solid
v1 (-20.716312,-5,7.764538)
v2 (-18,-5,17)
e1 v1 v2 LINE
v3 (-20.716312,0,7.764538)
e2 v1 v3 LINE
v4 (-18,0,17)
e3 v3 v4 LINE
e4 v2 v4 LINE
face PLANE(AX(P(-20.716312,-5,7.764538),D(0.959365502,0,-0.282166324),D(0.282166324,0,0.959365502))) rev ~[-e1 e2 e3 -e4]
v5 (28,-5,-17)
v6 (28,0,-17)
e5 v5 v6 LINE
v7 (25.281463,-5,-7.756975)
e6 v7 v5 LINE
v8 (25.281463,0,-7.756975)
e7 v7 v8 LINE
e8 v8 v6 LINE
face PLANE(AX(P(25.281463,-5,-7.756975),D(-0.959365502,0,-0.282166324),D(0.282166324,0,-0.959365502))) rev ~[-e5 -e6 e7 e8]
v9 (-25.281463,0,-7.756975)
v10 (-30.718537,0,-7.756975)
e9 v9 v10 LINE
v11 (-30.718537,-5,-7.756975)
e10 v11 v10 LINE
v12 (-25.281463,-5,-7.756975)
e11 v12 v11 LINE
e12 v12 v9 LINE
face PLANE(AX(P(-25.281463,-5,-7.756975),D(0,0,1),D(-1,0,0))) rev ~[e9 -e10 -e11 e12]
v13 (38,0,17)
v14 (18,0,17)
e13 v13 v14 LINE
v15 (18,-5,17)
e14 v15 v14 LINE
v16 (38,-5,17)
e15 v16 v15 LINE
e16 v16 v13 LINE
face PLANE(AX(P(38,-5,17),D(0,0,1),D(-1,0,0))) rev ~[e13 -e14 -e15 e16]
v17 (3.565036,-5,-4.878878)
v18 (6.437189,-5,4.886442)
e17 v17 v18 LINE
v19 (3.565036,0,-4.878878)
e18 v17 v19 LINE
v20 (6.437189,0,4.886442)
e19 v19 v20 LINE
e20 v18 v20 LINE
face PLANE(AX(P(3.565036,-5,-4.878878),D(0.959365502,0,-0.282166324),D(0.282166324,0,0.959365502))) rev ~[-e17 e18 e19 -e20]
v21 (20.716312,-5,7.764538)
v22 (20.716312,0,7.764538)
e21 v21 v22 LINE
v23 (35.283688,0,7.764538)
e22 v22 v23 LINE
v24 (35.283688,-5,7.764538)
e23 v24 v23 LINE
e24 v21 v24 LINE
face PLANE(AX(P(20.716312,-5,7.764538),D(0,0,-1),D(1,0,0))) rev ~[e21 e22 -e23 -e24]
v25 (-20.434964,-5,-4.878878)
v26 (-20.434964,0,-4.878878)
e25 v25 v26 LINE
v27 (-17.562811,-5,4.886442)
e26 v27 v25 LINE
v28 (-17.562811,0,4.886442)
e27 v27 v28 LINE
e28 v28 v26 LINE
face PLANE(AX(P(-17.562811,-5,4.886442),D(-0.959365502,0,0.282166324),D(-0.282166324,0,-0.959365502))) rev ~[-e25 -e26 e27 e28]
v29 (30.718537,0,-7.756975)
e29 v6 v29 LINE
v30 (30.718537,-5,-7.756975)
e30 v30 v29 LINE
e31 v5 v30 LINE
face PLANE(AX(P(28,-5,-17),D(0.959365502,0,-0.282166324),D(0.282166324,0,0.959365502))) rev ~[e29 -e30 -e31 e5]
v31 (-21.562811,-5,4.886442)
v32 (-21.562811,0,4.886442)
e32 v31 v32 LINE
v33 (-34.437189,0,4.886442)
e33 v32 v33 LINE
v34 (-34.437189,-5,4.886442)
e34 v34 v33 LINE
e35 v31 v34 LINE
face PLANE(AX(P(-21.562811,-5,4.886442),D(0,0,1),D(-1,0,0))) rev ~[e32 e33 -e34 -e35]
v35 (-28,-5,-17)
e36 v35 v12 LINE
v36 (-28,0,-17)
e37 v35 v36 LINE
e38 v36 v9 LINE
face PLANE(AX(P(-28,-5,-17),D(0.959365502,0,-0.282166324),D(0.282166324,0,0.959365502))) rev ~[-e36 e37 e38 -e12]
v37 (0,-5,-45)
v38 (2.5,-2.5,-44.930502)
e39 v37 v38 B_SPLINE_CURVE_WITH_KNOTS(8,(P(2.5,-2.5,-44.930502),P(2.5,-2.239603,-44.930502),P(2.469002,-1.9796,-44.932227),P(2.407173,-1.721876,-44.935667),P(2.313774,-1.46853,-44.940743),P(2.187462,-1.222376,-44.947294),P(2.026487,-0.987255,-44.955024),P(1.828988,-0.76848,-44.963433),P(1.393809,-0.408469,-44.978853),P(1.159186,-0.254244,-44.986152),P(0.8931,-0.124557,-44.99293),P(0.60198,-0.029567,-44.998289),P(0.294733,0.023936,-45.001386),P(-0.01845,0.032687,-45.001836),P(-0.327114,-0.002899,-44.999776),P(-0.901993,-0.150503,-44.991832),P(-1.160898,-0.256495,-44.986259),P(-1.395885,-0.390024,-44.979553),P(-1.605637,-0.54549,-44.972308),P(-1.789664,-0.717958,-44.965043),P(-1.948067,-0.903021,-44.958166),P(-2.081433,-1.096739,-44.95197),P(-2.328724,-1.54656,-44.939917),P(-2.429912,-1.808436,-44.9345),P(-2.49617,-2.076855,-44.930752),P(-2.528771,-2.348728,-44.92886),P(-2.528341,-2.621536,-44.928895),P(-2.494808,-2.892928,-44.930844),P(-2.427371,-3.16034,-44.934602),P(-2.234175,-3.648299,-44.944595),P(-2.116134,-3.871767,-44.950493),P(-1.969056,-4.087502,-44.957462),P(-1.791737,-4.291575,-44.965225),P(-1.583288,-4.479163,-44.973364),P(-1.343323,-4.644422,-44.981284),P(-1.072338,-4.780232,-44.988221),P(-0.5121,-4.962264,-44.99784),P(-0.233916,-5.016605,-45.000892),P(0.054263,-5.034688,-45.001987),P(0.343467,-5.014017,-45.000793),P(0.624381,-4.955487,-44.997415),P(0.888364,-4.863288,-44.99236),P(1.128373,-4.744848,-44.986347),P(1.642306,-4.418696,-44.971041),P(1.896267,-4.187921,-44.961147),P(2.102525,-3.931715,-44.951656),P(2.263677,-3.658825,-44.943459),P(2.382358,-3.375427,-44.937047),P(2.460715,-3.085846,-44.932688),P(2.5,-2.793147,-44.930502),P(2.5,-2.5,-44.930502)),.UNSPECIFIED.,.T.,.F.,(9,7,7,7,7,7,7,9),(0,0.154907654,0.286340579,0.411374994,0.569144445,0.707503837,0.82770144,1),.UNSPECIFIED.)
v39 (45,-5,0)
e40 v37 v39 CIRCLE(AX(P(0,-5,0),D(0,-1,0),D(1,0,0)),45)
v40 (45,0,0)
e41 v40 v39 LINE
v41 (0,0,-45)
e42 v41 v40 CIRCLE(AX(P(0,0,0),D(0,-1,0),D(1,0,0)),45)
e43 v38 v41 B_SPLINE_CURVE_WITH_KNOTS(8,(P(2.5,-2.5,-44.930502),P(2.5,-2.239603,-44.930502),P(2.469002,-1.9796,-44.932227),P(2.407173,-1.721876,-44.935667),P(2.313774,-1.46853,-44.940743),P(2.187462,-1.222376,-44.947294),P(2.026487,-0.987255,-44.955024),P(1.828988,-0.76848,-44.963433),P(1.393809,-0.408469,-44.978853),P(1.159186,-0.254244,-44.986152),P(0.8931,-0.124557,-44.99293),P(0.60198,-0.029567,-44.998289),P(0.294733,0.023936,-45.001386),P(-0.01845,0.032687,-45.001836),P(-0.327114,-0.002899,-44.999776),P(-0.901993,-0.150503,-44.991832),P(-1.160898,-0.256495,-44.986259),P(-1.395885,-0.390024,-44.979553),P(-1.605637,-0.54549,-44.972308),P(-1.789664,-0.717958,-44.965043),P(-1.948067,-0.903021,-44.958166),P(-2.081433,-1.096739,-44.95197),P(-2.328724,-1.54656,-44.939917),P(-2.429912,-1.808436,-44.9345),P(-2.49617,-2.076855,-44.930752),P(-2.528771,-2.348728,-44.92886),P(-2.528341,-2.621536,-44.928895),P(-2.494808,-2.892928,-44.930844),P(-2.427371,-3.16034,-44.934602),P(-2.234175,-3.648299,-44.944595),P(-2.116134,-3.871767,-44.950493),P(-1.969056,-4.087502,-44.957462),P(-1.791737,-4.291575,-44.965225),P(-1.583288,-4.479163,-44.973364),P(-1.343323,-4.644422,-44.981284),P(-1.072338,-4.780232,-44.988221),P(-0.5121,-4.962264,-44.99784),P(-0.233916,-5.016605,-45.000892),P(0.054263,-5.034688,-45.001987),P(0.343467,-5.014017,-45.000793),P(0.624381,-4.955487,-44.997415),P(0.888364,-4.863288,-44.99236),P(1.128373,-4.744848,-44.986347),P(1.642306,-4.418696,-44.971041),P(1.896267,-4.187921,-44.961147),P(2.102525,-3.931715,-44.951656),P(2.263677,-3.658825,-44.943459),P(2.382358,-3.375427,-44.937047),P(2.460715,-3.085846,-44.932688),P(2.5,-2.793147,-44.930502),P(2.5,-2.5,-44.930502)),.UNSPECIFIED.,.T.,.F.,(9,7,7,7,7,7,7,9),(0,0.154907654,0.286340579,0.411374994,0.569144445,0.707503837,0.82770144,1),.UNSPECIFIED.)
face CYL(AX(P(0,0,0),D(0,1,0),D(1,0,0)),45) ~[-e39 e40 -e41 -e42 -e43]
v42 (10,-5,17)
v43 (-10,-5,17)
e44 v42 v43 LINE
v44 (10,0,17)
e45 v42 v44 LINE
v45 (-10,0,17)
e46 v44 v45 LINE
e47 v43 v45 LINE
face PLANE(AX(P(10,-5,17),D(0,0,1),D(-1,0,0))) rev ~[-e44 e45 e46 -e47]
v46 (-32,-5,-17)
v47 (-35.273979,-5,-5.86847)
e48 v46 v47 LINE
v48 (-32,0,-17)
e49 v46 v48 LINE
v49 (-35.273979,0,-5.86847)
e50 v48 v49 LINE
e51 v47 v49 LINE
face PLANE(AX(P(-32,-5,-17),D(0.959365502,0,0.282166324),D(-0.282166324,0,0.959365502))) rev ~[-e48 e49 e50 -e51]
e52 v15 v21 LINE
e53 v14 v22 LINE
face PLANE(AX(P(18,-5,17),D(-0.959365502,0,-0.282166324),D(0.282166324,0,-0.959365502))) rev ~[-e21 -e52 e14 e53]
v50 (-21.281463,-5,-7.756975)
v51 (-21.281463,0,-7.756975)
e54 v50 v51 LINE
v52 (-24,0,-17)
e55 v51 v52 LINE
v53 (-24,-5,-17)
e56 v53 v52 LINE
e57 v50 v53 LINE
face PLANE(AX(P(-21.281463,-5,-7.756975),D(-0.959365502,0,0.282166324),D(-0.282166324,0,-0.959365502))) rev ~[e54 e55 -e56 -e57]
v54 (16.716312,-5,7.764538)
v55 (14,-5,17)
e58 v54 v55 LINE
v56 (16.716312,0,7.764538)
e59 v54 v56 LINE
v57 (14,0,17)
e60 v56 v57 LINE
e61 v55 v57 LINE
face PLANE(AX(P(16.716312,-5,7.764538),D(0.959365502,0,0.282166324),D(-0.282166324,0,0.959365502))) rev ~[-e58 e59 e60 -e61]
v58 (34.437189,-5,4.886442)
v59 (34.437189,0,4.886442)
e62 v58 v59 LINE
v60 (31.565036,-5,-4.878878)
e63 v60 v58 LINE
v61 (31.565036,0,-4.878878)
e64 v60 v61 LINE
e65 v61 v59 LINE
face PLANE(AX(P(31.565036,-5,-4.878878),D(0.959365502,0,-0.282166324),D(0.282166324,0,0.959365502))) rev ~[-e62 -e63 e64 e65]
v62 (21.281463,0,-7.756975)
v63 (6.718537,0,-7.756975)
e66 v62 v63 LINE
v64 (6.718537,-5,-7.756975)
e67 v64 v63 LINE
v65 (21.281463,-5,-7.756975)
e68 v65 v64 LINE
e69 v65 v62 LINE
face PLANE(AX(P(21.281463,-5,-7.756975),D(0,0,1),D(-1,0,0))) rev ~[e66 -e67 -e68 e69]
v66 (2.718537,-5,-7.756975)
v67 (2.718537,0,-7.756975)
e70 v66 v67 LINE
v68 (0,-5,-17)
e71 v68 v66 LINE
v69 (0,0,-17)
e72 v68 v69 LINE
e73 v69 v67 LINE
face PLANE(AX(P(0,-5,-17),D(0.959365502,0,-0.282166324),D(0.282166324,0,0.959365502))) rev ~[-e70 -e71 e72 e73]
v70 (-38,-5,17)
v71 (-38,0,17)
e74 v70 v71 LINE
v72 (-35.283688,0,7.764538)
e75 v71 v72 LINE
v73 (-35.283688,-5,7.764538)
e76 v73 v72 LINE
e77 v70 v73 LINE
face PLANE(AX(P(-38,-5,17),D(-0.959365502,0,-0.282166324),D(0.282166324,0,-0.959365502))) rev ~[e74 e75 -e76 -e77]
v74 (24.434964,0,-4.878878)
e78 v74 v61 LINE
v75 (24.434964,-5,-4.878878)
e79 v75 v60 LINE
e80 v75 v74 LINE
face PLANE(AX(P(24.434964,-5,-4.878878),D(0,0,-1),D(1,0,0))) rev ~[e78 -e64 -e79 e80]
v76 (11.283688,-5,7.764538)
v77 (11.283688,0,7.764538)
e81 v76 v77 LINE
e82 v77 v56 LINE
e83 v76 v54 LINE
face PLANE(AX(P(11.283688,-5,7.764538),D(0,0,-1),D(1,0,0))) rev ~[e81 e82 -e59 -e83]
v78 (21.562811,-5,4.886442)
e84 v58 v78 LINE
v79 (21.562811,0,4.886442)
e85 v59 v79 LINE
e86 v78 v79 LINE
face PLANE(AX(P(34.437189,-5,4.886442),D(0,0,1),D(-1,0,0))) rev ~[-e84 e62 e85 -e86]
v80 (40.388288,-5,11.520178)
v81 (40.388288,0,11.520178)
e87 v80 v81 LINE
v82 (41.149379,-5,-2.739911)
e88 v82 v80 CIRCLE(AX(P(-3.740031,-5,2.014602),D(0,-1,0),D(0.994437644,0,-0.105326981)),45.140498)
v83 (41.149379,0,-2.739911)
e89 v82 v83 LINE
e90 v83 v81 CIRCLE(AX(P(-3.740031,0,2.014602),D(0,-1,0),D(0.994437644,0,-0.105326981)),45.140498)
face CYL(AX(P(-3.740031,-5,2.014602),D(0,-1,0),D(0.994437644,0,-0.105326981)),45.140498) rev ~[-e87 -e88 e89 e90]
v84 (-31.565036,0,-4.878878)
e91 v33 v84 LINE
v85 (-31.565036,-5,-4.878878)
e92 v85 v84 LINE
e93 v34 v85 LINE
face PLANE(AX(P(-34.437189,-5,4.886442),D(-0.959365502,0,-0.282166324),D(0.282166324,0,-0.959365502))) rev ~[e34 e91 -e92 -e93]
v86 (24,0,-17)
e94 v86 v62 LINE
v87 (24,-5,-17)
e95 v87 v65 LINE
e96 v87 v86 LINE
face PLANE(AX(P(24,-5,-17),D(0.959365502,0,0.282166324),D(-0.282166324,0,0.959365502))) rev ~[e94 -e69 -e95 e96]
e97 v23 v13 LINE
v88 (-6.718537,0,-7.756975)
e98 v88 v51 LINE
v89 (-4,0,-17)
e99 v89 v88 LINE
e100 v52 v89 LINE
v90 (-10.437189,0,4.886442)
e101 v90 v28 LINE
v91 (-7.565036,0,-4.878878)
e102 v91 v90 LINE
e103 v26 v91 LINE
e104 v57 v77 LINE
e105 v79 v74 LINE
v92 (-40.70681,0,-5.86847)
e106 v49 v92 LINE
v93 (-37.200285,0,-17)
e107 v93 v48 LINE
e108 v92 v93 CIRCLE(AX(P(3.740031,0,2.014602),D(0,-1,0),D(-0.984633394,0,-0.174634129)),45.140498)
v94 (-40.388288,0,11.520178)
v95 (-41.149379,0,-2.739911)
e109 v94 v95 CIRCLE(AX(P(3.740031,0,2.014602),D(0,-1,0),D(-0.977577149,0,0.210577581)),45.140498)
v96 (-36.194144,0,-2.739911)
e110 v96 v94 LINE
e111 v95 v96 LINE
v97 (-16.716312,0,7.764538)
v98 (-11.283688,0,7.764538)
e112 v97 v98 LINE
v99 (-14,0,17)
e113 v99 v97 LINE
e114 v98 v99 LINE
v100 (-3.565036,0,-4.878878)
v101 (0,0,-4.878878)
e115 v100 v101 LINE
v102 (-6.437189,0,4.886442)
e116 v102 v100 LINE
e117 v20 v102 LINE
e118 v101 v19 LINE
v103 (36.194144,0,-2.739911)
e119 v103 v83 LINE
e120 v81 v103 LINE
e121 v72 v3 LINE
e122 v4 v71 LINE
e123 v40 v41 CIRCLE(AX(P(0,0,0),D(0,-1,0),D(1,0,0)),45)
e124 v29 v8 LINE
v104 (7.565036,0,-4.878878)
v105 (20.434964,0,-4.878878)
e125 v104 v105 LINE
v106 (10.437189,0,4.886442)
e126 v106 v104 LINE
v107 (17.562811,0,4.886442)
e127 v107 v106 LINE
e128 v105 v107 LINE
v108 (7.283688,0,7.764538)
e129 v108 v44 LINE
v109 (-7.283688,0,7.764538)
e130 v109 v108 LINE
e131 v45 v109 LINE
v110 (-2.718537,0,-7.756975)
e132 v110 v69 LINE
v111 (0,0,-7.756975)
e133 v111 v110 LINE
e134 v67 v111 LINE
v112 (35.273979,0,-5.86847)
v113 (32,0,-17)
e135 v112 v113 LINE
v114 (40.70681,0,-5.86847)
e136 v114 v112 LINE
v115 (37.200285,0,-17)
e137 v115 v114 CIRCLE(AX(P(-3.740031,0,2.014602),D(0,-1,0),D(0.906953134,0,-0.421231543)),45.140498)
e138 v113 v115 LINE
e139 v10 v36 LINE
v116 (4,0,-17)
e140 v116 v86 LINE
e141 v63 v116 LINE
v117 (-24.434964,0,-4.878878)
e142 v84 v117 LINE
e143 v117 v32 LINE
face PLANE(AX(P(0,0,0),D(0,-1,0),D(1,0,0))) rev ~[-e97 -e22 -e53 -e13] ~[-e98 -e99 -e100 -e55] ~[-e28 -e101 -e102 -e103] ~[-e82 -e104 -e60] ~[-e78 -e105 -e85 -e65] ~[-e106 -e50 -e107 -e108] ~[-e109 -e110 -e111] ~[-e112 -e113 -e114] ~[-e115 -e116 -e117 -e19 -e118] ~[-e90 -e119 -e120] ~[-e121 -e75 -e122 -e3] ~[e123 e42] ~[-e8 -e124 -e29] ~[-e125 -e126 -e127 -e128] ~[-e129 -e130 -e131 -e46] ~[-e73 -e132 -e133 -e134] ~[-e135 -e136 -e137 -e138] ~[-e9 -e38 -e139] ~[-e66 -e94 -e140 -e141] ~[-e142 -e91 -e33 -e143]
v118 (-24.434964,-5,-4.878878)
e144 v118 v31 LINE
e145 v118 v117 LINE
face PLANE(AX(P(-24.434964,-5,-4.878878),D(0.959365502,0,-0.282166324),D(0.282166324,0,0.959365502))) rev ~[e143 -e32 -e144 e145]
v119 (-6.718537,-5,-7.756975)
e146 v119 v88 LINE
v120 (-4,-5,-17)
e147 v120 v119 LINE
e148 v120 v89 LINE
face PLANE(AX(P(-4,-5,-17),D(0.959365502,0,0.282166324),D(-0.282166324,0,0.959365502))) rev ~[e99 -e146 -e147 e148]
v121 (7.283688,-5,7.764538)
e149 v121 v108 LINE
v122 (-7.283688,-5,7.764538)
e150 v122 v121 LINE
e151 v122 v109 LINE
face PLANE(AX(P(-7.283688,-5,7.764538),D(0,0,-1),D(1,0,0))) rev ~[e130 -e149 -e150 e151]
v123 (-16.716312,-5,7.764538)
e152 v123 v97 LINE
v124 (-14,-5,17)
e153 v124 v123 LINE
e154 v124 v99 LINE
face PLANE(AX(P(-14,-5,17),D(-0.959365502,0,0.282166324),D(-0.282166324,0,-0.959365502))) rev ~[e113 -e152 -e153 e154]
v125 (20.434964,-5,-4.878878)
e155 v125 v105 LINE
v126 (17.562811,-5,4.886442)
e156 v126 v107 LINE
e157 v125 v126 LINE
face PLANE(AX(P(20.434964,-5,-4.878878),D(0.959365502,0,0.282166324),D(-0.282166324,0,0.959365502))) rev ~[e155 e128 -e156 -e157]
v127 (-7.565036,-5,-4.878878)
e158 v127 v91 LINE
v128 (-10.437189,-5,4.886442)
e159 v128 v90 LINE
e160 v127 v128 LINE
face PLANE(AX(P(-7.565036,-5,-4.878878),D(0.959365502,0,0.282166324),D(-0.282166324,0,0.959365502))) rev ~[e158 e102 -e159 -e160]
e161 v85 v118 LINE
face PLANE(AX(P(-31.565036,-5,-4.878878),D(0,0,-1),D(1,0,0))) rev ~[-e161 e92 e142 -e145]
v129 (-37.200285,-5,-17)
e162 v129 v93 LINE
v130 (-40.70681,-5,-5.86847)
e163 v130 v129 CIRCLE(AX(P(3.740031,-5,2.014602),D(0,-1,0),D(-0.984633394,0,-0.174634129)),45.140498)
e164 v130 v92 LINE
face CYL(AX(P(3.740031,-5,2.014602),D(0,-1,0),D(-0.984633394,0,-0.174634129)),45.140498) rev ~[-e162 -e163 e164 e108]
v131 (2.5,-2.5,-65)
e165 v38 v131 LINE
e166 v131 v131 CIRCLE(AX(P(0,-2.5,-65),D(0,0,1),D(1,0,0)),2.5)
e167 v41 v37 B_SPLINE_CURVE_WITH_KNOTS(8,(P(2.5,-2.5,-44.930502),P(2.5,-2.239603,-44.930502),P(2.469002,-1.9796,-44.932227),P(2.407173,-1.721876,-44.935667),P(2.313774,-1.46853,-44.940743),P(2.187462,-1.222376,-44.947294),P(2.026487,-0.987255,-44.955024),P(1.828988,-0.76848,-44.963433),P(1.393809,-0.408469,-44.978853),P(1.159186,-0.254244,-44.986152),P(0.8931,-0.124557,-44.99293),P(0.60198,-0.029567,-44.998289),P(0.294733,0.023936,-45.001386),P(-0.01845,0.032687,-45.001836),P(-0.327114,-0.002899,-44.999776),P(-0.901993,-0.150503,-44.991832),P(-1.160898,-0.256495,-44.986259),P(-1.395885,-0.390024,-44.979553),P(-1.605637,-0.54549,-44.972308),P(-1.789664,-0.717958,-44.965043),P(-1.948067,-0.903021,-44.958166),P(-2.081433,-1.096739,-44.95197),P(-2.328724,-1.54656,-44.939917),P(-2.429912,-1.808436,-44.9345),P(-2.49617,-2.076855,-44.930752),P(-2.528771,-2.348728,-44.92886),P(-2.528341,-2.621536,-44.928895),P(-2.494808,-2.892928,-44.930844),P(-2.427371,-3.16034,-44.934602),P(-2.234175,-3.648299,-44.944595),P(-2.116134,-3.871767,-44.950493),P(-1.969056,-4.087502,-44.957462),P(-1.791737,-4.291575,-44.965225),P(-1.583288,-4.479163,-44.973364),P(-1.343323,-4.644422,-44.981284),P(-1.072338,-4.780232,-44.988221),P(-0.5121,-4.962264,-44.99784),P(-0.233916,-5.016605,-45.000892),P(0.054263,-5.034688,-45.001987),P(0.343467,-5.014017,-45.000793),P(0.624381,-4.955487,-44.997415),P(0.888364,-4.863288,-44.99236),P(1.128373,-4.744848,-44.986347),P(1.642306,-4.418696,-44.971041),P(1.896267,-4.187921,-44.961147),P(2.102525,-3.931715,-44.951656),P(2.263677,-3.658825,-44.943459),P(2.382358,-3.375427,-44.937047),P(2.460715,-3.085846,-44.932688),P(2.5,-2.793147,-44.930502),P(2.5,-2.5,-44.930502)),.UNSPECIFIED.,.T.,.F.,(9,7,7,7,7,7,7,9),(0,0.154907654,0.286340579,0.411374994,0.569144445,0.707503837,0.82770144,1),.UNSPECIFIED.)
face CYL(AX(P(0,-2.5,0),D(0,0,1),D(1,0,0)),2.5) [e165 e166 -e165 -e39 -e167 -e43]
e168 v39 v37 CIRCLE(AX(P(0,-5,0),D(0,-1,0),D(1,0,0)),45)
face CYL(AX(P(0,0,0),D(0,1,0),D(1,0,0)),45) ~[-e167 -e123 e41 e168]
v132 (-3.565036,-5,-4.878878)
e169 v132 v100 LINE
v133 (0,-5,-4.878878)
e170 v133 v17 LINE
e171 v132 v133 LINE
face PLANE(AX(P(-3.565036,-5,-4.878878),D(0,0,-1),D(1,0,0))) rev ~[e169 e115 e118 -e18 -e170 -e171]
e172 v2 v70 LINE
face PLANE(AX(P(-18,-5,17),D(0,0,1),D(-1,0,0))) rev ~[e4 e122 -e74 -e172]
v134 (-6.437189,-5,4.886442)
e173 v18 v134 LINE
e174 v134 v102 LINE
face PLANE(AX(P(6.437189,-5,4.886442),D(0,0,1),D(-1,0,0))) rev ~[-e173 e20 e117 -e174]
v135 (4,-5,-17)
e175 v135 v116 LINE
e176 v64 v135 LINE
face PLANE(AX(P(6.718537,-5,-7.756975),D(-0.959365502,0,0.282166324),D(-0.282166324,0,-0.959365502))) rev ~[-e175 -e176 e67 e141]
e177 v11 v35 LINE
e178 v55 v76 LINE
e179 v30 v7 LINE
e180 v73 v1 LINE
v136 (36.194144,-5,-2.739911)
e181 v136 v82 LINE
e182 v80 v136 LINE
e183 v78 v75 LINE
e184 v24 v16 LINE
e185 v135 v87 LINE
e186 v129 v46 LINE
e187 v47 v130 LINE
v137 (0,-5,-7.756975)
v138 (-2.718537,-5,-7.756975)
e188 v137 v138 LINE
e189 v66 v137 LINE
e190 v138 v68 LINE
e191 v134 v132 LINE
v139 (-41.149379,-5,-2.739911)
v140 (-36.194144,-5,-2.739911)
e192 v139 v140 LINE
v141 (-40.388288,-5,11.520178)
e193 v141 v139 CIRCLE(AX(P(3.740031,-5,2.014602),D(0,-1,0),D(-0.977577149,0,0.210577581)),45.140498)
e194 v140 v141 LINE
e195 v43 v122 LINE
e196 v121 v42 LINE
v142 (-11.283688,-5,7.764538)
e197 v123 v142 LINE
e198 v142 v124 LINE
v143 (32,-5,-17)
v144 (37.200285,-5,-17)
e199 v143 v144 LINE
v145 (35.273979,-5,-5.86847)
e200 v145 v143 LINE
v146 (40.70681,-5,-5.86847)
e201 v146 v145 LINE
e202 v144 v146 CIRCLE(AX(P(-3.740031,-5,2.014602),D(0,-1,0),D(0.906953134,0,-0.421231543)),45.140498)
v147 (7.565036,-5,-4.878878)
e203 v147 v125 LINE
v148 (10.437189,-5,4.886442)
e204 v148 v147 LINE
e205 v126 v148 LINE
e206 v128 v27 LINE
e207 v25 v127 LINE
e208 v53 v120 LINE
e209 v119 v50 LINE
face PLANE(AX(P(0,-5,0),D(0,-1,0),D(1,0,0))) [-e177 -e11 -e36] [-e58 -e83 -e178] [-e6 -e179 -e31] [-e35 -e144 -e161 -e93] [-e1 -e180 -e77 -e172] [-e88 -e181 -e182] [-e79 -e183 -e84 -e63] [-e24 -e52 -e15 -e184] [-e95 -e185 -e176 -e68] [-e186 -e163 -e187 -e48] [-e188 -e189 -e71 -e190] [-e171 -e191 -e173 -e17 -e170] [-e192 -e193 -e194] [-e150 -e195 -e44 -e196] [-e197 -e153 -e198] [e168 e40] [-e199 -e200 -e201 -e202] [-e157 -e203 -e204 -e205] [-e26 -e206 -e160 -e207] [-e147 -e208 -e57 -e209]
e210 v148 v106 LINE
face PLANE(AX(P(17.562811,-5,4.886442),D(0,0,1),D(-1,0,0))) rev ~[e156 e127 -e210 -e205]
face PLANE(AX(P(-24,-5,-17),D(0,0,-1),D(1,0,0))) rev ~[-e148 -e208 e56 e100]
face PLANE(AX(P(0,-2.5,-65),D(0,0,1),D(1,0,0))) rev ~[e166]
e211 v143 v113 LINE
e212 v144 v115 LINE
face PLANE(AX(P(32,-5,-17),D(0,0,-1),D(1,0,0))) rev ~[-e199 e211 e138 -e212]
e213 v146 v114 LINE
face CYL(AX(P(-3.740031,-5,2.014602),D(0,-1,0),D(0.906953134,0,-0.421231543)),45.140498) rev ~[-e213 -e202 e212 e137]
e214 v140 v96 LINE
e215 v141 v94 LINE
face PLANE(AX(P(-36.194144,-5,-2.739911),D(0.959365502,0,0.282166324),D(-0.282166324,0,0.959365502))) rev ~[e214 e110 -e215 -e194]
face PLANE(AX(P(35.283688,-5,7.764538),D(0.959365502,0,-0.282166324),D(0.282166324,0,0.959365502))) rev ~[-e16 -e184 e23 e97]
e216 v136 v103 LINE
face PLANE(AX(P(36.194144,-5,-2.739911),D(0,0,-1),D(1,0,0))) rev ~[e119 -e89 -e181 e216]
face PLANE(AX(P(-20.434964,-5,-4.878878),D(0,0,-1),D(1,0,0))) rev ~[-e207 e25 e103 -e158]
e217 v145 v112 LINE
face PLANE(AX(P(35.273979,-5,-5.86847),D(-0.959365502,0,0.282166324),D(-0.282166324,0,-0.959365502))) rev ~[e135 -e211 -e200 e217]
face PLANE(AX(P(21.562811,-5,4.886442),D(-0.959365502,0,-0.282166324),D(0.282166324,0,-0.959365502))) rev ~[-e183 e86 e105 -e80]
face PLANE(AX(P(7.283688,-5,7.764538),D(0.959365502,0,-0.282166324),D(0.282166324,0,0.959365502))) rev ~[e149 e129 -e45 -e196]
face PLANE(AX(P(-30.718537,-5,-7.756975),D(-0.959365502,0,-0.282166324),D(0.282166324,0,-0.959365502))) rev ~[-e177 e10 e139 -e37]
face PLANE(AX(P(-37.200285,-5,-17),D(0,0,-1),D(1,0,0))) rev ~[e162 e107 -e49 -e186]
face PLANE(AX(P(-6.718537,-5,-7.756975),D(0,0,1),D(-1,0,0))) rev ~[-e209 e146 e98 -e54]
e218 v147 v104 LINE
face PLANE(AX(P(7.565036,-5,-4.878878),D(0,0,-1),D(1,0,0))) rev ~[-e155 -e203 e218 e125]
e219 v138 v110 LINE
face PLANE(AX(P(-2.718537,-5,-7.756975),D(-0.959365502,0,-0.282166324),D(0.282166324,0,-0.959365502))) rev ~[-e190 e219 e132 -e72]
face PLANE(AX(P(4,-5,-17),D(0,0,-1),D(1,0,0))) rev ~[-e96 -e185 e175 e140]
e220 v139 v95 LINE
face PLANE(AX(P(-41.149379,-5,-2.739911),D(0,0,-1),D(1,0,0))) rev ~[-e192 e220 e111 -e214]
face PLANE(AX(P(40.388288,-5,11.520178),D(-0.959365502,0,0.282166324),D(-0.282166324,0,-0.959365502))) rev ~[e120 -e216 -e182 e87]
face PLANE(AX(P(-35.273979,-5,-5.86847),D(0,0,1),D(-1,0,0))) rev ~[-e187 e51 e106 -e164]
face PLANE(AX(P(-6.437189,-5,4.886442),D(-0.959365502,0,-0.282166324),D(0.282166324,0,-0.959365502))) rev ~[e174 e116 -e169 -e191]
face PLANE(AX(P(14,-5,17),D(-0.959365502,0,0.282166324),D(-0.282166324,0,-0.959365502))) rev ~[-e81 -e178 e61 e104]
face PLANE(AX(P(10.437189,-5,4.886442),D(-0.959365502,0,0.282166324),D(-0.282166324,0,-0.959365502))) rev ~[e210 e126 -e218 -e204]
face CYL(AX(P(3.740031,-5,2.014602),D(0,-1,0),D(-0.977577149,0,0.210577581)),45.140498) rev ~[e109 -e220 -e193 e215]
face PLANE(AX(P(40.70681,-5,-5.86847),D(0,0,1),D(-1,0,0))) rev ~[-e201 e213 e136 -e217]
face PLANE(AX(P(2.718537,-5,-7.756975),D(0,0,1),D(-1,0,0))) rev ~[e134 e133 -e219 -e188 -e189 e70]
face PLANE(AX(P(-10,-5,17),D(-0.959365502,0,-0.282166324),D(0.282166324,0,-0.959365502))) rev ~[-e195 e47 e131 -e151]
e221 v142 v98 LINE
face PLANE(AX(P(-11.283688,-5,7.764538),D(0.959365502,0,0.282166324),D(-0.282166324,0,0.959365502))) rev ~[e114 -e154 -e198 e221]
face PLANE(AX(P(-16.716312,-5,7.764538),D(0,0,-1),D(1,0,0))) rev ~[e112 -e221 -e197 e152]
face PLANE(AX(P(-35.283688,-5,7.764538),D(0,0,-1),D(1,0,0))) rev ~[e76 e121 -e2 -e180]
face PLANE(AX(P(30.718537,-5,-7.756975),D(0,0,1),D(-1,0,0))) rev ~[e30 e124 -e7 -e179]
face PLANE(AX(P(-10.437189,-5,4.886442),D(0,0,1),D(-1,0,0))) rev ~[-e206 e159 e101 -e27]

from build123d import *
from build123d import SkipClean  # not in build123d's __all__

# Parameters (mm, degrees)
F0_R     = 45
F1_DEPTH = 5
F2_R     = 2.5
F3_DEPTH = 65
F7_DEPTH = 5.0010001144


# Not quite as in the source:
# - a feature of the source that left no trace in its solid (it failed there, or was rolled back) is left out
# - a feature names something its author has since deleted; it is built from what else it names


with BuildPart() as f1:
    # F0 (on Front) → F1 (new body)
    with BuildSketch(Plane.XZ):
        Circle(F0_R)
    extrude(amount=F1_DEPTH)

    # F2 (on Top) → F3 (join)
    with BuildSketch(Plane.XY):
        with Locations((0, -2.5)):
            Circle(F2_R)
    with SkipClean():  # cleaning this boolean's faces spoils the solid; the shape is the same uncleaned
        extrude(amount=-F3_DEPTH)

    # F6 (on face) → F7 (cut, through all)
    with BuildSketch(Plane.XZ.offset(5)):
        Polygon((-20.7163122443, 7.7645383693), (-18, 17), (-38, 17), (-35.2836877557, 7.7645383693), align=None)
        with BuildLine():
            Line((-36.1941438848, -2.7399107917), (-40.3882877696, 11.5201784167))
            ThreePointArc((-40.3882877696, 11.5201784167), (-41.3363102402, 4.4204212554), (-41.1493788917, -2.7399107917))
            Line((-41.1493788917, -2.7399107917), (-36.1941438848, -2.7399107917))
        make_face()
        with BuildLine():
            Line((-32, -17), (-35.2739794285, -5.8684699433))
            Line((-35.2739794285, -5.8684699433), (-40.7068101942, -5.8684699433))
            ThreePointArc((-40.7068101942, -5.8684699433), (-39.3148104816, -11.548035888), (-37.2002845672, -17))
            Line((-37.2002845672, -17), (-32, -17))
        make_face()
        Polygon((-24.4349641852, -4.8788782297), (-21.5628112163, 4.8864418646), (-34.4371887837, 4.8864418646), (-31.5650358148, -4.8788782297), align=None)
        Polygon((-28, -17), (-25.2814631572, -7.7569747344), (-30.7185368428, -7.7569747344), align=None)
        Polygon((-11.2836877557, 7.7645383693), (-14, 17), (-16.7163122443, 7.7645383693), align=None)
        Polygon((-7.5650358148, -4.8788782297), (-10.4371887837, 4.8864418646), (-17.5628112163, 4.8864418646), (-20.4349641852, -4.8788782297), align=None)
        Polygon((-4, -17), (-6.7185368428, -7.7569747344), (-21.2814631572, -7.7569747344), (-24, -17), align=None)
        Polygon((0, -7.7569747344), (-2.7185368428, -7.7569747344), (0, -17), align=None)
        Polygon((0, -7.7569747344), (0, -17), (2.7185368428, -7.7569747344), align=None)
        Polygon((6.4371887837, 4.8864418646), (0, 4.8864418646), (0, 0), (0, -4.8788782297), (3.5650358148, -4.8788782297), align=None)
        Polygon((0, 4.8864418646), (-6.4371887837, 4.8864418646), (-3.5650358148, -4.8788782297), (0, -4.8788782297), (0, 0), align=None)
        Polygon((0, 17), (-10, 17), (-7.2836877557, 7.7645383693), (0, 7.7645383693), align=None)
        Polygon((10, 17), (0, 17), (0, 7.7645383693), (7.2836877557, 7.7645383693), align=None)
        Polygon((16.7163122443, 7.7645383693), (14, 17), (11.2836877557, 7.7645383693), align=None)
        Polygon((17.5628112163, 4.8864418646), (10.4371887837, 4.8864418646), (7.5650358148, -4.8788782297), (20.4349641852, -4.8788782297), align=None)
        Polygon((21.2814631572, -7.7569747344), (6.7185368428, -7.7569747344), (4, -17), (24, -17), align=None)
        Polygon((25.2814631572, -7.7569747344), (28, -17), (30.7185368428, -7.7569747344), align=None)
        Polygon((24.4349641852, -4.8788782297), (31.5650358148, -4.8788782297), (34.4371887837, 4.8864418646), (21.5628112163, 4.8864418646), align=None)
        Polygon((20.7163122443, 7.7645383693), (35.2836877557, 7.7645383693), (38, 17), (18, 17), align=None)
        with BuildLine():
            ThreePointArc((41.1493788917, -2.7399107917), (41.3363102402, 4.4204212554), (40.3882877696, 11.5201784167))
            Line((40.3882877696, 11.5201784167), (36.1941438848, -2.7399107917))
            Line((36.1941438848, -2.7399107917), (41.1493788917, -2.7399107917))
        make_face()
        with BuildLine():
            Line((40.7068101942, -5.8684699433), (35.2739794285, -5.8684699433))
            Line((35.2739794285, -5.8684699433), (32, -17))
            Line((32, -17), (37.2002845672, -17))
            ThreePointArc((37.2002845672, -17), (39.3148104816, -11.548035888), (40.7068101942, -5.8684699433))
        make_face()
    with SkipClean():  # cleaning this boolean's faces spoils the solid; the shape is the same uncleaned
        extrude(amount=-F7_DEPTH, mode=Mode.SUBTRACT)


solid = f1.part
